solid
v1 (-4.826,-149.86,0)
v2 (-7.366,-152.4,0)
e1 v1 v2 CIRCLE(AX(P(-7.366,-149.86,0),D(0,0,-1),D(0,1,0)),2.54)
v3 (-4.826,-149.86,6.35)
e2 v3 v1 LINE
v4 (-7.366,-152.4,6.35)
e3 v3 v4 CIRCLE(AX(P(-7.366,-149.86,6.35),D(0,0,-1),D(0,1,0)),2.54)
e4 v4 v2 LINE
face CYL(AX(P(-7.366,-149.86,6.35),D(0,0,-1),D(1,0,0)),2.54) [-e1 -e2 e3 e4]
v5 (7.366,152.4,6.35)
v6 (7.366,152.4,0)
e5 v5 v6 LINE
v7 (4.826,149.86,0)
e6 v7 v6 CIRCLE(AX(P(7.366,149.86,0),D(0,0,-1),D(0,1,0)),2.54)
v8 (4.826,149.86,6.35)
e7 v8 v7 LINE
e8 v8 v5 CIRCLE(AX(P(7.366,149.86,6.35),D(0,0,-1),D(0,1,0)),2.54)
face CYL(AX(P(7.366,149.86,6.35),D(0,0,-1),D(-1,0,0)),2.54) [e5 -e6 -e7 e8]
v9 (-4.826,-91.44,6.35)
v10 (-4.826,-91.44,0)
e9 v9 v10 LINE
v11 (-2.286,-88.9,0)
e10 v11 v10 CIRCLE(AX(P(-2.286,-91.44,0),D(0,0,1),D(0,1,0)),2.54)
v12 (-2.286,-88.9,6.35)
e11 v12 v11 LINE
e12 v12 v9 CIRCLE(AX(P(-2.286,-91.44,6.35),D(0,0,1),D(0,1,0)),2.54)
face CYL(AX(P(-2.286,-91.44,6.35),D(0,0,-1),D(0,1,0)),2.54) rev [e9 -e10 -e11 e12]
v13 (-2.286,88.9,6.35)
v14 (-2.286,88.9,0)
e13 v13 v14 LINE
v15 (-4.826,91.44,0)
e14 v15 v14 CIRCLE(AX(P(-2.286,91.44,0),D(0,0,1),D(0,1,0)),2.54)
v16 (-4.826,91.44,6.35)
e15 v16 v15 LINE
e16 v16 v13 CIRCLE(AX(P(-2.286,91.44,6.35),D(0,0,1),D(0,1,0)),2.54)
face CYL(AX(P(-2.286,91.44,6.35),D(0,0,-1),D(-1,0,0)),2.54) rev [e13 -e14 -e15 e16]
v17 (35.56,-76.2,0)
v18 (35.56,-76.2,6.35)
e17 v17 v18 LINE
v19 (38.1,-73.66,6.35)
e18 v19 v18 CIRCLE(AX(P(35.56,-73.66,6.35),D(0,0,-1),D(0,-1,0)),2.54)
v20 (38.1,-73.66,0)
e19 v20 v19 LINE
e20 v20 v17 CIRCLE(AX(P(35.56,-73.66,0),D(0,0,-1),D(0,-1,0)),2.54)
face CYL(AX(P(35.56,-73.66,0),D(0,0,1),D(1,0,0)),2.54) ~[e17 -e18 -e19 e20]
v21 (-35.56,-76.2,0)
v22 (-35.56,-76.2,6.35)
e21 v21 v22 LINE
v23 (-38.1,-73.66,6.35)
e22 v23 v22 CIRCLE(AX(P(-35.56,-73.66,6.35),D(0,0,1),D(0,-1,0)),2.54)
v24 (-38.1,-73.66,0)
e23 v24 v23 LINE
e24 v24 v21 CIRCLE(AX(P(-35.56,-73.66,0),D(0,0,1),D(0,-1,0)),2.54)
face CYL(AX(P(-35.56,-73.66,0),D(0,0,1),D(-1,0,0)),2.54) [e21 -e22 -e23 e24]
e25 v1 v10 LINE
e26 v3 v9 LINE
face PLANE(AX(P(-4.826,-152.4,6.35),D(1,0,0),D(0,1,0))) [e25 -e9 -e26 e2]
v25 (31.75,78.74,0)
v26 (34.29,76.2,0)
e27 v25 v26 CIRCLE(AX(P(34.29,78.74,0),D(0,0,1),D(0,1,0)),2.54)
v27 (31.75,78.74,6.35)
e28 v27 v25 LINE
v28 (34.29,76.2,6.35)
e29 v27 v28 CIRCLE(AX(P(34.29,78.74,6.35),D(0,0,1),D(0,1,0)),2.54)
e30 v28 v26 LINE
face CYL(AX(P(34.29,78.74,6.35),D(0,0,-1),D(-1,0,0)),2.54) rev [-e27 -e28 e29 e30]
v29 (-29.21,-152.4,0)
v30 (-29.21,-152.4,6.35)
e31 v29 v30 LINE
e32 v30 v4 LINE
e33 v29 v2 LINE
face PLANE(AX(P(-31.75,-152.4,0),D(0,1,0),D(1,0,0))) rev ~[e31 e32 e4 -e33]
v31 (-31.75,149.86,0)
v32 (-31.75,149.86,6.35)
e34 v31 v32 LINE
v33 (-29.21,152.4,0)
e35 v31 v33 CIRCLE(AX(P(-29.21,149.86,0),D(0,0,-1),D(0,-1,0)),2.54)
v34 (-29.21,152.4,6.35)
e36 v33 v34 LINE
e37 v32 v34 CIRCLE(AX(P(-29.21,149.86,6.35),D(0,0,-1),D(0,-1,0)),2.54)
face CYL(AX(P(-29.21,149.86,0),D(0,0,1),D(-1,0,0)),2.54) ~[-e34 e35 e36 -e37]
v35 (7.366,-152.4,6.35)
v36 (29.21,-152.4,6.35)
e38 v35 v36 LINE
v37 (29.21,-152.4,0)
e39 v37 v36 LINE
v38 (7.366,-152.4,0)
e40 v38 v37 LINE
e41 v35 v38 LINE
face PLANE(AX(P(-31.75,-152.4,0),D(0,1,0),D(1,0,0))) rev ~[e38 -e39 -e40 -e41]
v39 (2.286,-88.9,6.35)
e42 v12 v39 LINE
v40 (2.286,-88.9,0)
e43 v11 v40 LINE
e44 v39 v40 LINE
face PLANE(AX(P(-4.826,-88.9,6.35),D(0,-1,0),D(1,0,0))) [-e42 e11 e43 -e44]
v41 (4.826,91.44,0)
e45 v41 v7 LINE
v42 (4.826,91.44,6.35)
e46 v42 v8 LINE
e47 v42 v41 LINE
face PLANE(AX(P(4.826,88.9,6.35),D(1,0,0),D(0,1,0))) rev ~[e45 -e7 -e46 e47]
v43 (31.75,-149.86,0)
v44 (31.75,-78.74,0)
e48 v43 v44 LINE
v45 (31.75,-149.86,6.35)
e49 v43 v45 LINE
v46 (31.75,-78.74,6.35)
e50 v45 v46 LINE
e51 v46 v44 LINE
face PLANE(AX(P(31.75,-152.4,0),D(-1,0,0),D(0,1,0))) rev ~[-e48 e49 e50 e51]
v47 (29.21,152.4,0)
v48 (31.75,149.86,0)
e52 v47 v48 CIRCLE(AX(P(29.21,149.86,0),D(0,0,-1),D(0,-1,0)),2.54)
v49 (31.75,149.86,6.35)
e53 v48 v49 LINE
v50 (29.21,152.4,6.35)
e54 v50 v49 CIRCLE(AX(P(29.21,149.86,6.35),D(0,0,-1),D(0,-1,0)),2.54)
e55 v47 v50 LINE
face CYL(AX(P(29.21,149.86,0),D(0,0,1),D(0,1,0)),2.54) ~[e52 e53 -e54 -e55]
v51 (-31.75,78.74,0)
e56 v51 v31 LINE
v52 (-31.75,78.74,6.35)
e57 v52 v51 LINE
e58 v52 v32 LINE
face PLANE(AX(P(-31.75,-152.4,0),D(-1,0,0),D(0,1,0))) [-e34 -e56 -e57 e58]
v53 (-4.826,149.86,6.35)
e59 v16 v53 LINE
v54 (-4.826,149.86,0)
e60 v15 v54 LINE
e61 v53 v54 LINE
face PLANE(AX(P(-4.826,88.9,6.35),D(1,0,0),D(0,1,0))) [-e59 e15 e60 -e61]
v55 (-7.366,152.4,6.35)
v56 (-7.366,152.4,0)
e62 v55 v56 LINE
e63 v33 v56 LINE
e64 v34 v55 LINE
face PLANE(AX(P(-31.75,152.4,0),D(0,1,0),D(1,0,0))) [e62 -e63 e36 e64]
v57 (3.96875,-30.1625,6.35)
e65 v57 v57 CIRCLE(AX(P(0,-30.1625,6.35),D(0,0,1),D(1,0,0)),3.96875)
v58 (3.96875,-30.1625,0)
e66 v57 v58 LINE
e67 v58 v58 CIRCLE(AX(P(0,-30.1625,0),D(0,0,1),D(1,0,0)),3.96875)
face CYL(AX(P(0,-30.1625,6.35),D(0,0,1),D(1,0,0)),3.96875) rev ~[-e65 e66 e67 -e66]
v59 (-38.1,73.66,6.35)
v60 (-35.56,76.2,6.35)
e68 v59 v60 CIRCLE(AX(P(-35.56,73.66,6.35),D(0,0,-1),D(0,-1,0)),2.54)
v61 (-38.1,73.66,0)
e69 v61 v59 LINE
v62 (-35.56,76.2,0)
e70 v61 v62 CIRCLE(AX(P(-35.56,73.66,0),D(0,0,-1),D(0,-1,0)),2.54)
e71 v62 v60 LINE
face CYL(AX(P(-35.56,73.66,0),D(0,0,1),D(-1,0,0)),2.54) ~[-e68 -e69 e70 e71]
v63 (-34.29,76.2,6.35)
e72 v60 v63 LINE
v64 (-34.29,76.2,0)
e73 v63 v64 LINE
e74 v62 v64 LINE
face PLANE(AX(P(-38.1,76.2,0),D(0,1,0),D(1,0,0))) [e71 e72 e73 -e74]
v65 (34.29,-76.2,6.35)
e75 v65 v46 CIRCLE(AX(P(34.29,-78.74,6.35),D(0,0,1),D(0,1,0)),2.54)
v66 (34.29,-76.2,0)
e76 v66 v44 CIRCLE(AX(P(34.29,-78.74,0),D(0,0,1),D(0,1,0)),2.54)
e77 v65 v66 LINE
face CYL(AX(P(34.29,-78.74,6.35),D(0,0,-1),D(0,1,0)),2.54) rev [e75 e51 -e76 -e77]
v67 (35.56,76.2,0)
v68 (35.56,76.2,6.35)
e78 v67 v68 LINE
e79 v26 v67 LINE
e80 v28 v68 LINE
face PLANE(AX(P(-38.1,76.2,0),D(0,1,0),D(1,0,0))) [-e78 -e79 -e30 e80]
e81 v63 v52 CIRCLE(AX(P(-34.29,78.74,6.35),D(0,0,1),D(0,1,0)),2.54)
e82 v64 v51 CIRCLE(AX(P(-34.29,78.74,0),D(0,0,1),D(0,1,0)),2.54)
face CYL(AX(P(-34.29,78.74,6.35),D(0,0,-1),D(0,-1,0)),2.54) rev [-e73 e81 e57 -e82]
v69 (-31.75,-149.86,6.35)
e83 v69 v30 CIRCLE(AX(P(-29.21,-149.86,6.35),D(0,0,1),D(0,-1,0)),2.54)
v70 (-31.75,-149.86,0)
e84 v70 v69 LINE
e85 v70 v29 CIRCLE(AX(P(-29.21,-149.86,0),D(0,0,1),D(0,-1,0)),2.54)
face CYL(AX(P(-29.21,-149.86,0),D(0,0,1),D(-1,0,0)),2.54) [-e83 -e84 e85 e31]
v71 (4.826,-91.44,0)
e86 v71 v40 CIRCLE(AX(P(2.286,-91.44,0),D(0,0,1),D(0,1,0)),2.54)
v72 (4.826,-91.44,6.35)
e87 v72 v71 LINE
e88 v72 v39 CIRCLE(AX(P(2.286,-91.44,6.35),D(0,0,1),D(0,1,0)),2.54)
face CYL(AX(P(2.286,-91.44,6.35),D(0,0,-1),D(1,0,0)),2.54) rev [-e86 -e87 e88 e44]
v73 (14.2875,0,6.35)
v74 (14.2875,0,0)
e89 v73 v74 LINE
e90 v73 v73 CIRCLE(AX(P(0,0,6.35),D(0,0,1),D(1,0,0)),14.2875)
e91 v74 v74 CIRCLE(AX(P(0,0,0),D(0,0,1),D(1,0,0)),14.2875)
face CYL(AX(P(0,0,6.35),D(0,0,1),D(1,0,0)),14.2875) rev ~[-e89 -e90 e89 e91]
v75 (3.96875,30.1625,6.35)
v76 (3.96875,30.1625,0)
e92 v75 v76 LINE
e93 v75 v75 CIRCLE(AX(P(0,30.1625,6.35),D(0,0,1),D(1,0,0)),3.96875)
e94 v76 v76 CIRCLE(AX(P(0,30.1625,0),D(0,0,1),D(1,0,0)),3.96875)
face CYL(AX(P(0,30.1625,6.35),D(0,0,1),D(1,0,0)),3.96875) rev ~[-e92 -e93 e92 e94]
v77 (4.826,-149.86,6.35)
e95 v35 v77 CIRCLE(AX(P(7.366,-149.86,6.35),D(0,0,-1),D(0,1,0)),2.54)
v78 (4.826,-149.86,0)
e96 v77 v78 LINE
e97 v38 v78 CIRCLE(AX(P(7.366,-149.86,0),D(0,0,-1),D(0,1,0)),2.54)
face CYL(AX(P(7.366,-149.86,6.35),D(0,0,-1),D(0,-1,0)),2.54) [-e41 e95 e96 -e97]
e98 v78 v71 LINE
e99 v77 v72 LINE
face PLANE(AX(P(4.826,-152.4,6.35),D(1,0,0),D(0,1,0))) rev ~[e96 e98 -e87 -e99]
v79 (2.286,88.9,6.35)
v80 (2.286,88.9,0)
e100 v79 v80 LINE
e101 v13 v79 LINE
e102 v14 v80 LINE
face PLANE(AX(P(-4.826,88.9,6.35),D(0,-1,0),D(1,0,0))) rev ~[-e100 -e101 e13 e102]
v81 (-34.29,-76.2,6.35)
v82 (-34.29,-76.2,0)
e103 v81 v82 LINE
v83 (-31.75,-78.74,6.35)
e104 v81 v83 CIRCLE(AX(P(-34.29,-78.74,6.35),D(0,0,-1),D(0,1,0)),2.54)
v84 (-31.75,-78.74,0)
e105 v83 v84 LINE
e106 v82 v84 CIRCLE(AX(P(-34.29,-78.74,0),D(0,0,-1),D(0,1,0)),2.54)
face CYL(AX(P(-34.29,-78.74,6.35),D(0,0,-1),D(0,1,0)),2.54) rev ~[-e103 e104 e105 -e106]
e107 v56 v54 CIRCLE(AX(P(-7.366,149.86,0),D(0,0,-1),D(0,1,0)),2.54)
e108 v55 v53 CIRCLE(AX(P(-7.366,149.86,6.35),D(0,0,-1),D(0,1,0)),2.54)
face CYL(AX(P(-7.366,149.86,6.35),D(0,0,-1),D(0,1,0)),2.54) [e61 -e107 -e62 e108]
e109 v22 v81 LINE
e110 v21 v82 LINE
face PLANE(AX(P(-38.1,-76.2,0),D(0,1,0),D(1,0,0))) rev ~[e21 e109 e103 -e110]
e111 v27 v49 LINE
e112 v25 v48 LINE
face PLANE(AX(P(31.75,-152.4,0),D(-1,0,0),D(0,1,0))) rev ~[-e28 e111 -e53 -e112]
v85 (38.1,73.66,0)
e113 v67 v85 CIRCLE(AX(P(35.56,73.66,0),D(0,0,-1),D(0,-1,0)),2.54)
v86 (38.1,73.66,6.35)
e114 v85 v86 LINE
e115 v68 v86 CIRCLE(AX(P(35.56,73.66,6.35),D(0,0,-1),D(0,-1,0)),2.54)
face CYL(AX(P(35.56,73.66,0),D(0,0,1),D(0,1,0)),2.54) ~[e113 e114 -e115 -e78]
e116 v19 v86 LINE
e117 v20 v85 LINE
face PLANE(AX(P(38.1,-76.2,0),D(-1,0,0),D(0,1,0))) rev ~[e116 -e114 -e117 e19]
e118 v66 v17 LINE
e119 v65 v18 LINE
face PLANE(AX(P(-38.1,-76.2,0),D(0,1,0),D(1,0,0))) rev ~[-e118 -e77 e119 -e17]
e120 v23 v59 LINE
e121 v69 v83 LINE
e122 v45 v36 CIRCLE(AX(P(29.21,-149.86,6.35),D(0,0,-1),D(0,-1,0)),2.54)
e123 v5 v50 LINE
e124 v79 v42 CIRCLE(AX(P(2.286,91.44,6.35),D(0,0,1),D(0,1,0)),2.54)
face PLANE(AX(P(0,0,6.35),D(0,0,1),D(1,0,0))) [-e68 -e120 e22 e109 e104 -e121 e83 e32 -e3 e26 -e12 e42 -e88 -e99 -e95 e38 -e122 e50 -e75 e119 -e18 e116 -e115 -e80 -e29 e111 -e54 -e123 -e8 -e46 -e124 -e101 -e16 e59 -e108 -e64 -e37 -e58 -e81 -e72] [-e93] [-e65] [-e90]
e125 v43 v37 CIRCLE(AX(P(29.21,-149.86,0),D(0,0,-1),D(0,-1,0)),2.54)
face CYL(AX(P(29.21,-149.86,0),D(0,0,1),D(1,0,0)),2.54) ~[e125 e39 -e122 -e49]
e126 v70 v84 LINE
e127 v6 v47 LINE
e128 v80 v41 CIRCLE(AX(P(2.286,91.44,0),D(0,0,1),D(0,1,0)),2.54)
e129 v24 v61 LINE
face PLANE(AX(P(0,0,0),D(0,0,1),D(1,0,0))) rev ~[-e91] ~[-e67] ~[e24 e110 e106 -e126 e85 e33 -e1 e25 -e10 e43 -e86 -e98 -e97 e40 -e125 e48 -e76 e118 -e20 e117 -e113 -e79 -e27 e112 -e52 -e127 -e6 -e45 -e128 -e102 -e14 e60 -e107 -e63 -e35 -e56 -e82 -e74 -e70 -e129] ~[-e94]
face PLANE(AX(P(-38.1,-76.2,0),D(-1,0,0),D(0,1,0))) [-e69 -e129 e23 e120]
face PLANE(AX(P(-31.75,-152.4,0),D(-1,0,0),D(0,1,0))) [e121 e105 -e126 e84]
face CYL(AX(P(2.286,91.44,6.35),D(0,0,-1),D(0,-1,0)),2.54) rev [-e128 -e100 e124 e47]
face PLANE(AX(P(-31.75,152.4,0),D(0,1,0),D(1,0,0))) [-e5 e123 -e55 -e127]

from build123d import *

# Parameters (mm, degrees)
F0_W     = 63.5
F0_H     = 304.8
F1_DEPTH = 6.35
F2_W     = 76.2
F2_H     = 152.4
F3_DEPTH = 6.35
F4_W     = 9.652
F4_H     = 63.5
F4_R     = 14.2875
F4_R_2   = 3.96875
F5_DEPTH = 6.351
F6_R     = 2.54


with BuildPart() as f1:
    # F0 (on Top) → F1 (new body)
    with BuildSketch(Plane.XY):
        Rectangle(F0_W, F0_H)
    extrude(amount=F1_DEPTH)

    # F2 (on Top) → F3 (join)
    with BuildSketch(Plane.XY):
        Rectangle(F2_W, F2_H)
    extrude(amount=F3_DEPTH)

    # F4 (on face) → F5 (cut, through all)
    with BuildSketch(Plane.XY.offset(6.35)):
        with Locations((0, 120.65)):
            Rectangle(F4_W, F4_H)
        with Locations((0, -120.65)):
            Rectangle(F4_W, F4_H)
        Circle(F4_R)
        with Locations((0, 30.1625)):
            Circle(F4_R_2)
        with Locations((0, -30.1625)):
            Circle(F4_R_2)
    extrude(amount=-F5_DEPTH, mode=Mode.SUBTRACT)

    # F6
    f6_edges = [f1.edges().sort_by_distance(p)[0] for p in [
        (-38.1, 76.2, 3.175),
        (-31.75, 76.2, 3.175),
        (-31.75, 152.4, 3.175),
        (-4.826, 152.4, 3.175),
        (4.826, 152.4, 3.175),
        (4.826, 88.9, 3.175),
        (-4.826, 88.9, 3.175),
        (31.75, 152.4, 3.175),
        (31.75, 76.2, 3.175),
        (38.1, 76.2, 3.175),
        (38.1, -76.2, 3.175),
        (31.75, -76.2, 3.175),
        (31.75, -152.4, 3.175),
        (4.826, -152.4, 3.175),
        (4.826, -88.9, 3.175),
        (-4.826, -88.9, 3.175),
        (-4.826, -152.4, 3.175),
        (-31.75, -152.4, 3.175),
        (-31.75, -76.2, 3.175),
        (-38.1, -76.2, 3.175),
    ]]
    fillet(f6_edges, radius=F6_R)


solid = f1.part
